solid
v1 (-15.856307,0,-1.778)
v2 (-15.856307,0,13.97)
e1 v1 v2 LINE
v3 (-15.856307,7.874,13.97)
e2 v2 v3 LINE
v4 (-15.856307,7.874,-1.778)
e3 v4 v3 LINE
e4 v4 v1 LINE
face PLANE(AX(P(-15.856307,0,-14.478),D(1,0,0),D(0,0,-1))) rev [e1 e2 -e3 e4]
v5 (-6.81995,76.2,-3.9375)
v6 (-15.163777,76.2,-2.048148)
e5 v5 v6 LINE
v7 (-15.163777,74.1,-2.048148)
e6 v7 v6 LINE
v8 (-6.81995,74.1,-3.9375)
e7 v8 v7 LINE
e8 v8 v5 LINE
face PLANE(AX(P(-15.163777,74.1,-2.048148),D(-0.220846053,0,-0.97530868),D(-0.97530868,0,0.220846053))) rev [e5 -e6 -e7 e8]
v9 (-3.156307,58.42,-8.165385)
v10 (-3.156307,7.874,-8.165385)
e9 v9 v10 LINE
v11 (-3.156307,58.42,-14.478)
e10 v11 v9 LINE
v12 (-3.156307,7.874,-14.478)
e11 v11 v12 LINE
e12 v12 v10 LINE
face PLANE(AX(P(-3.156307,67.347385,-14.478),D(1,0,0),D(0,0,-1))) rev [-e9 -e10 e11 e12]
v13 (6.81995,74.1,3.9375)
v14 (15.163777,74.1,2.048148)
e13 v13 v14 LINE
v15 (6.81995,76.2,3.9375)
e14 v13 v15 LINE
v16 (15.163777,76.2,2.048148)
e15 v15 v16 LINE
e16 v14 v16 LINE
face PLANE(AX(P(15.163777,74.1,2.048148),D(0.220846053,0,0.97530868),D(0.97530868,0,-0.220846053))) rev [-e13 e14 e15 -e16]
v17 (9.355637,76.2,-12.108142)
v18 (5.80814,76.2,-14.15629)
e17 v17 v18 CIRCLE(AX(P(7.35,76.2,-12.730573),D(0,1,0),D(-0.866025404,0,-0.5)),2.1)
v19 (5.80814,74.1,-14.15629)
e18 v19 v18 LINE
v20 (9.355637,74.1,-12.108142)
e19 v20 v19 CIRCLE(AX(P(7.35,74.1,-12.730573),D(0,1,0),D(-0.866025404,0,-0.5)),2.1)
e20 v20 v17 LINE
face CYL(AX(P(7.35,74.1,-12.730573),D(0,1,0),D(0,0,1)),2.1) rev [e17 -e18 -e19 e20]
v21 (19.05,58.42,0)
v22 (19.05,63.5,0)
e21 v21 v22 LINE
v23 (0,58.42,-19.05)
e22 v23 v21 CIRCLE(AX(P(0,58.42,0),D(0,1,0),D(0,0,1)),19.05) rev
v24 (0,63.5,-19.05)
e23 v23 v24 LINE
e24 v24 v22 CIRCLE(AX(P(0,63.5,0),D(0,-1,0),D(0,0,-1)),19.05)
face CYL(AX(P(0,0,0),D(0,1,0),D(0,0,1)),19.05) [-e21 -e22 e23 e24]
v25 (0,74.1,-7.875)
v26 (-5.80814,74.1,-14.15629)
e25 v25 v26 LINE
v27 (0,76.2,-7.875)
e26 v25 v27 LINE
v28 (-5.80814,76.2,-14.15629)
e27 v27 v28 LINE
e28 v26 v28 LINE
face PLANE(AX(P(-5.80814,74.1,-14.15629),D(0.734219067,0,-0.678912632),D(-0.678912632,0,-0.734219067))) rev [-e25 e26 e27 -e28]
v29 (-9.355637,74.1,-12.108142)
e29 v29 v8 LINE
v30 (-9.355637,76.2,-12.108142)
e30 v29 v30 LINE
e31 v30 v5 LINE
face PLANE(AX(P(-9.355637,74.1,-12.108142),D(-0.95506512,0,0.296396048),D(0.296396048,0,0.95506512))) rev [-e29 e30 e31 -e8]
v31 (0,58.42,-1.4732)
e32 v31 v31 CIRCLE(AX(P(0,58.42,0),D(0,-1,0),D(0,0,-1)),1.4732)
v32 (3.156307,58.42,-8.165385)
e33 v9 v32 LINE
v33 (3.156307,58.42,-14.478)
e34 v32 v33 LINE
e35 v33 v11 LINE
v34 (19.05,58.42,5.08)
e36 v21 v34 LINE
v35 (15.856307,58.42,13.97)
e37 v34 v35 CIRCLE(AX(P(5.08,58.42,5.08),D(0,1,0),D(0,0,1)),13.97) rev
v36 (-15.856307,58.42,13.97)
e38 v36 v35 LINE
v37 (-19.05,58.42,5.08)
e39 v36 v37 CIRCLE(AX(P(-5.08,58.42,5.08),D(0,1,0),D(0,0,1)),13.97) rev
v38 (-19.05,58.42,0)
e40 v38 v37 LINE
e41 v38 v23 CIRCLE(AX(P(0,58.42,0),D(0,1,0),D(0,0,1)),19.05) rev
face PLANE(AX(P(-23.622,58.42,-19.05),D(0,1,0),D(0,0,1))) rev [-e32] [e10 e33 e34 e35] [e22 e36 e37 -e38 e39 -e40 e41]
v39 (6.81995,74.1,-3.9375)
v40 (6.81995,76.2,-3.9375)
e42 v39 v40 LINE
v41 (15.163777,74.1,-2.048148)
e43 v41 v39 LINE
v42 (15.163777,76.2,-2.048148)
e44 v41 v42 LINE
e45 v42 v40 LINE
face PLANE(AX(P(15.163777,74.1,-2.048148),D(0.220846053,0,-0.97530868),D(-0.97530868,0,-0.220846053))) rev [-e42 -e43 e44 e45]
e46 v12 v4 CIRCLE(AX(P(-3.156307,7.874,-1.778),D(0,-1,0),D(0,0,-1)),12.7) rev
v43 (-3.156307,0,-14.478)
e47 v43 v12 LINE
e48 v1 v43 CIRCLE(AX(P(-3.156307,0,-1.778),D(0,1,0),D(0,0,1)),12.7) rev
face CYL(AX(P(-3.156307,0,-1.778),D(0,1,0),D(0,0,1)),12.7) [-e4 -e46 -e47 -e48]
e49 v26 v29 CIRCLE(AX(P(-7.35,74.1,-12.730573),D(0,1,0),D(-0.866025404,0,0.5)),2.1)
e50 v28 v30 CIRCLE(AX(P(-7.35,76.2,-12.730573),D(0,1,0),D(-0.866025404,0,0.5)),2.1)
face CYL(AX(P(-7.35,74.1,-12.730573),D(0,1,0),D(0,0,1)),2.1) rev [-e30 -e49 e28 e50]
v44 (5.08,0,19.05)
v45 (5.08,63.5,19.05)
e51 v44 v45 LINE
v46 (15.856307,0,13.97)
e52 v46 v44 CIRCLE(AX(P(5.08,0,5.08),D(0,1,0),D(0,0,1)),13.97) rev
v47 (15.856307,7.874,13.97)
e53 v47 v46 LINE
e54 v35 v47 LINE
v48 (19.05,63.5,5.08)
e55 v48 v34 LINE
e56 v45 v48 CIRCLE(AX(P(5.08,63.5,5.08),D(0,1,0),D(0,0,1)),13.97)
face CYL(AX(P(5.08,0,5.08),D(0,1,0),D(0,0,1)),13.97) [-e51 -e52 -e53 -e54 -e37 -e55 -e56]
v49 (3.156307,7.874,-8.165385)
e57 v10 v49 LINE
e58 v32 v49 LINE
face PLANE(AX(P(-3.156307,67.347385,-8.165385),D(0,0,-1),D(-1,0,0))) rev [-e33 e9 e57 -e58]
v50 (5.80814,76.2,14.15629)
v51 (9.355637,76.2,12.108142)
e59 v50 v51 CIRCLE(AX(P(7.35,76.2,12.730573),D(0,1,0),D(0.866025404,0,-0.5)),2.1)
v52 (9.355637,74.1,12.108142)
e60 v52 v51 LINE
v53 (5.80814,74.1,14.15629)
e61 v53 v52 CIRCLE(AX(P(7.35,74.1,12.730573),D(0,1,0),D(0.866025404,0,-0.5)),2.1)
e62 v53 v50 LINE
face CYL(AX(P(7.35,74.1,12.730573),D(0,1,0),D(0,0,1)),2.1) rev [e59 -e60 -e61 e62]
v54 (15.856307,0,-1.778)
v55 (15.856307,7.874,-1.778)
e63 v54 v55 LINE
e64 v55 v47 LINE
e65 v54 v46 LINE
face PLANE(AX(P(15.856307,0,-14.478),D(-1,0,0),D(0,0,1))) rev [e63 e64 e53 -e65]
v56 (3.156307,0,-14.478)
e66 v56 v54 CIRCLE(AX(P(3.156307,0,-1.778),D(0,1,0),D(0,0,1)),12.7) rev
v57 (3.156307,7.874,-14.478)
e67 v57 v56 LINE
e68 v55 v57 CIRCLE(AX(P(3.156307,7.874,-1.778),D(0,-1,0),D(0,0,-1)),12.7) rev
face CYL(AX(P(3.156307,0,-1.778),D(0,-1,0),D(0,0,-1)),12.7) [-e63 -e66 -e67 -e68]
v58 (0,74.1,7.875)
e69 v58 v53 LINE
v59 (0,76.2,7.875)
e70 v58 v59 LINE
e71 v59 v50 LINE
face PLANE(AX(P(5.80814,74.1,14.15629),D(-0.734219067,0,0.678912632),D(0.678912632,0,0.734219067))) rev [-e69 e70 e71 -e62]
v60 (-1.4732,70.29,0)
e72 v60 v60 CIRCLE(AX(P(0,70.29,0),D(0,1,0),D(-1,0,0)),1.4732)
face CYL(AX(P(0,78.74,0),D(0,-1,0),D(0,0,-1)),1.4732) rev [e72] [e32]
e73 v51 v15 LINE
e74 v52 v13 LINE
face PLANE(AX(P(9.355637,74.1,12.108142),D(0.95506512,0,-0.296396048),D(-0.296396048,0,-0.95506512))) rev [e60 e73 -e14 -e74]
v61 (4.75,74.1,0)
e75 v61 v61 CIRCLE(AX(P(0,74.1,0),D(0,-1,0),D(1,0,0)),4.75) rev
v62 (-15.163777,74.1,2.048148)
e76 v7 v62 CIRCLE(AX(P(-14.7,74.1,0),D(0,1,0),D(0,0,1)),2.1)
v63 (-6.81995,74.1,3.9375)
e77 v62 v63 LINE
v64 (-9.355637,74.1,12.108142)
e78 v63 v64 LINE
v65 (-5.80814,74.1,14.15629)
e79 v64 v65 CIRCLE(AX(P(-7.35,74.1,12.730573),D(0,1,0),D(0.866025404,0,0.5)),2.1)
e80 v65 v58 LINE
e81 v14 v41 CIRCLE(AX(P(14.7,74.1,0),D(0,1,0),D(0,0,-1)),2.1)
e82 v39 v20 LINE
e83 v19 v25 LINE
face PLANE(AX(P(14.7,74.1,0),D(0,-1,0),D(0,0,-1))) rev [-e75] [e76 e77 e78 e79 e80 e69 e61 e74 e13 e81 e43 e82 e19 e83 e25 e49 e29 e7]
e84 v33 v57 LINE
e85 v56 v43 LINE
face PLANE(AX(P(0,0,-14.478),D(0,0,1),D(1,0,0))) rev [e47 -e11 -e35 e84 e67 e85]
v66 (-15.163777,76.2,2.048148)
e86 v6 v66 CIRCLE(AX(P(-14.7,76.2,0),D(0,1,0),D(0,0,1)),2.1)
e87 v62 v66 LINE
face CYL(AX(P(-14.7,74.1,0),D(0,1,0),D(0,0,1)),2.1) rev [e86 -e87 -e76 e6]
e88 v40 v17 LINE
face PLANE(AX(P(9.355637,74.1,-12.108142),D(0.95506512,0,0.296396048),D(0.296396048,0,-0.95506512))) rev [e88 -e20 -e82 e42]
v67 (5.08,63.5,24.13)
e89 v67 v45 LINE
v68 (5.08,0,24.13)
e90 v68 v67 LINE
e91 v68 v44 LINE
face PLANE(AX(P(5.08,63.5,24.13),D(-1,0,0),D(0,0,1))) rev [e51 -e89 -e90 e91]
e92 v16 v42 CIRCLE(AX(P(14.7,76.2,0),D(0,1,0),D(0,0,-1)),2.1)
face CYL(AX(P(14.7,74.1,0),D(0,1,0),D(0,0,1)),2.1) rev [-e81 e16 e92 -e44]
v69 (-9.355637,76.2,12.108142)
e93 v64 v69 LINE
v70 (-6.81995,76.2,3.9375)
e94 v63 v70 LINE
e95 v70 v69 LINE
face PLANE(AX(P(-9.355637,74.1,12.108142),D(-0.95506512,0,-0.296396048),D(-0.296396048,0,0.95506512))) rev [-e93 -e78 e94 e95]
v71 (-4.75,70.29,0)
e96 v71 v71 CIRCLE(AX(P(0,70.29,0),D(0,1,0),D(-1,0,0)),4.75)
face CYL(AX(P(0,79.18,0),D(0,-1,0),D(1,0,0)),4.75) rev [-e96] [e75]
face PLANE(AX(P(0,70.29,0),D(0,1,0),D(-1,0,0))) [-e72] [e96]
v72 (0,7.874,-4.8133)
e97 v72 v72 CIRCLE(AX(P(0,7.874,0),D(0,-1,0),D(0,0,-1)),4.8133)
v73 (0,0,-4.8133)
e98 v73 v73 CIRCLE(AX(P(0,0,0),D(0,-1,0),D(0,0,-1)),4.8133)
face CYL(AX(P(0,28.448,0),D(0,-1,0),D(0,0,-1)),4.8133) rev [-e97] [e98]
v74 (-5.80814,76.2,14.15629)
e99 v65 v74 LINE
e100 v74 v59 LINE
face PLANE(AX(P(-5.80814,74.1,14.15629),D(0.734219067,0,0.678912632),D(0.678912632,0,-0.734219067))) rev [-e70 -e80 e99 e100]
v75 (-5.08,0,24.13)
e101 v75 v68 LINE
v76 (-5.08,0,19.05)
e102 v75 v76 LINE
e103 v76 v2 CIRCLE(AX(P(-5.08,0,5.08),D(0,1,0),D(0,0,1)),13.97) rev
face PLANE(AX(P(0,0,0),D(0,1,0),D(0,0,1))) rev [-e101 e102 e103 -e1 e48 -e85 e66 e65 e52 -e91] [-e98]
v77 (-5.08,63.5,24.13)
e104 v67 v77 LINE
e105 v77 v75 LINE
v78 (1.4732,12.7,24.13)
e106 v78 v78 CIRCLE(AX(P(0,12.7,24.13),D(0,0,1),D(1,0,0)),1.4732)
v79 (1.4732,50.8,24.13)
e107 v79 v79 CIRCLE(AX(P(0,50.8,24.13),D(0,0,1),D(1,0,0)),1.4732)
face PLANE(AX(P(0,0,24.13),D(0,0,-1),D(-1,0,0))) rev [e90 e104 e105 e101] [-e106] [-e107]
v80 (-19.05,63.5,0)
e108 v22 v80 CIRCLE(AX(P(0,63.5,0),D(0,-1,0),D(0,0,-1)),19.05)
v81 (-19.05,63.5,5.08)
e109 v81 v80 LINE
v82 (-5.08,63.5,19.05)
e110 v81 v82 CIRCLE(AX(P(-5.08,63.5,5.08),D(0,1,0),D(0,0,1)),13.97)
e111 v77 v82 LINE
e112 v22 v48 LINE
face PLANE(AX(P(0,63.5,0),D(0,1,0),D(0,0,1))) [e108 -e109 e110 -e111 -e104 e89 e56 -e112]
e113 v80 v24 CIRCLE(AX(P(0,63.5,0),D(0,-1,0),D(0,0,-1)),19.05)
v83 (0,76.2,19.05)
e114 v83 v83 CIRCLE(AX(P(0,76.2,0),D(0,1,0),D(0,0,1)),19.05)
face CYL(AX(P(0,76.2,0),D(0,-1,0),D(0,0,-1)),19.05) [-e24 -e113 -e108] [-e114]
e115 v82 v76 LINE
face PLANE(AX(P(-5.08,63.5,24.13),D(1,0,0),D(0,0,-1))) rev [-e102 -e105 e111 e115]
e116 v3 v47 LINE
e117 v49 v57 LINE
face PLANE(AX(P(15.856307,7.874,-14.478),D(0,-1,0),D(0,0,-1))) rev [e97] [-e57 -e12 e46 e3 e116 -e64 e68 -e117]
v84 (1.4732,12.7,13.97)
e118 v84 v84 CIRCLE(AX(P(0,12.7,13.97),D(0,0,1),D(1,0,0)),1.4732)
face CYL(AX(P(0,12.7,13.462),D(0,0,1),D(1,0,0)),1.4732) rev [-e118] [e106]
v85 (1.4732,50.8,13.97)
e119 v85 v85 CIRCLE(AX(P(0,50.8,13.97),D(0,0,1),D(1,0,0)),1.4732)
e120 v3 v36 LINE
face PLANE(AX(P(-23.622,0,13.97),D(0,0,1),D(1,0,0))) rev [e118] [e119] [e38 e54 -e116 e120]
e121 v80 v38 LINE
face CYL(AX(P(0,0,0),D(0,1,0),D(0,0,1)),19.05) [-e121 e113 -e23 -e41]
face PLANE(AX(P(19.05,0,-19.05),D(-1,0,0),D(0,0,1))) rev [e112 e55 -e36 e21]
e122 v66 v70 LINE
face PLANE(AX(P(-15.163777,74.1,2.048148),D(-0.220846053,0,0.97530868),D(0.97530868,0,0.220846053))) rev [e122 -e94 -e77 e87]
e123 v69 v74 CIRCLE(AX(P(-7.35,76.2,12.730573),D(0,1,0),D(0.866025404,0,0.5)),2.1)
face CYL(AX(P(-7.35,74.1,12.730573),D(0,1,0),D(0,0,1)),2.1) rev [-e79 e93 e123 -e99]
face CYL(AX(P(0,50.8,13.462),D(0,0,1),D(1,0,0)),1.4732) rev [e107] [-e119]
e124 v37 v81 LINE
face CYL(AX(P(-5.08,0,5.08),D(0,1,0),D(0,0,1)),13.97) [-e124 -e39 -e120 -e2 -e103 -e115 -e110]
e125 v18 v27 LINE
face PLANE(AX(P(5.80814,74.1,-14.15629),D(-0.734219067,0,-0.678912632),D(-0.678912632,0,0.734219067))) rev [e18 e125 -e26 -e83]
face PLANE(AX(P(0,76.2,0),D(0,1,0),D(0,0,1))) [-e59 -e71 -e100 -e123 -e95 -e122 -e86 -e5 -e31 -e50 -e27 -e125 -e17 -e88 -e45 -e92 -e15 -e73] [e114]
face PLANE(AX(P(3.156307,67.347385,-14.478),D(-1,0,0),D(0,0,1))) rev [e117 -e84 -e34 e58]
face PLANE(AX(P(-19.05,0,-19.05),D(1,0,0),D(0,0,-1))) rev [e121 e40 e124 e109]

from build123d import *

# Parameters (mm, degrees)
SKETCH1_R               = 19.05
BOSS_EXTRUDE1_DEPTH     = 76.2
CAVITY1_START           = 74.1
CAVITY1_OUTLINE_R       = 1.05
CAVITY1_OUTLINE_R_2     = 4.4625
CAVITY1_DEPTH           = 2.1
CAVITY1_START_2         = 71.1599999
CAVITY1_2_OUTLINE_R     = 4.4625
CAVITY1_2_OUTLINE_R_2   = 3.15
CAVITY1_2_DEPTH         = 4.7775
CAVITY1_3_OUTLINE_R     = 3.15
CAVITY1_3_OUTLINE_R_2   = 1.785
CAVITY1_3_DEPTH         = 1.05
CAVITY1_START_3         = 70.95
CAVITY1_4_DEPTH         = 3.15
CUT_EXTRUDE1_DEPTH      = 5.08
CUT_EXTRUDE1_DEPTH_BACK = 3.81
SKETCH2_R               = 4.75
SKETCH4_W               = 8.715142414
SKETCH4_H               = 2.720359939
CUT_EXTRUDE2_DEPTH      = 2.1
SKETCH5_R               = 19.05
CUT_EXTRUDE3_DEPTH      = 63.5
SKETCH8_W               = 38.1
SKETCH8_H               = 38.1
BOSS_EXTRUDE2_DEPTH     = 63.5
SKETCH9_W               = 33.02
SKETCH9_H               = 58.42
CUT_EXTRUDE4_DEPTH      = 42.672
FILLET1_R               = 19.05
FILLET2_R               = 13.97
SKETCH11_W              = 10.16
SKETCH11_H              = 63.5
BOSS_EXTRUDE3_DEPTH     = 5.08
SKETCH12_R              = 1.4732
CUT_EXTRUDE5_DEPTH      = 10.668
SKETCH13_R              = 1.4732
CUT_EXTRUDE6_DEPTH      = 20.32
SKETCH14_W              = 31.71261469
SKETCH14_H              = 7.874
BOSS_EXTRUDE4_DEPTH     = 28.448
FILLET3_R               = 12.7
SKETCH15_R              = 4.8133
CUT_EXTRUDE7_DEPTH      = 28.448
SKETCH16_W              = 2.261133912
SKETCH16_H              = 1.481432563
SKETCH16_W_2            = 1.871283238
SKETCH16_H_2            = 2.027223507
SKETCH16_W_3            = 2.027223508
SKETCH16_H_3            = 2.222148845
SKETCH16_W_4            = 12.670146923
SKETCH16_H_4            = 11.890445574
SKETCH16_W_5            = 1.793313103
SKETCH16_W_6            = 2.30011898
SKETCH16_H_5            = 1.793313103
SKETCH16_H_6            = 1.520417631
CUT_EXTRUDE8_DEPTH      = 2.1
SKETCH17_W              = 6.31261469
SKETCH17_H              = 6.312614691
BOSS_EXTRUDE5_DEPTH     = 50.546


with BuildPart() as part:
    # Sketch1 → Boss-Extrude1 (new body)
    with BuildSketch(Plane(origin=(0, 0, 0), x_dir=(1, 0, 0), z_dir=(0, 1, 0))):
        with Locations(Location((0, 0, 0), (0, 0, 90))):
            Circle(SKETCH1_R)
    extrude(amount=BOSS_EXTRUDE1_DEPTH)

    # Cavity1: read off the stored shape, not the designer's step
    # Cavity1 outline → Cavity1 (cut)
    with BuildSketch(Plane(origin=(0, 0, 0), x_dir=(1, 0, 0), z_dir=(0, 1, 0)).offset(CAVITY1_START)):
        with BuildLine():
            ThreePointArc((5.80813996, -14.156289963), (8.4, -14.549226784), (9.355636751, -12.108141735))
            Line((9.355636751, -12.108141735), (6.819950055, -3.9375))
            Line((6.819950055, -3.9375), (15.163776711, -2.048148228))
            ThreePointArc((15.163776711, -2.048148228), (16.8, 0), (15.163776711, 2.048148228))
            Line((15.163776711, 2.048148228), (6.819950055, 3.9375))
            Line((6.819950055, 3.9375), (9.355636751, 12.108141735))
            ThreePointArc((9.355636751, 12.108141735), (8.4, 14.549226784), (5.80813996, 14.156289963))
            Line((5.80813996, 14.156289963), (0, 7.875))
            Line((0, 7.875), (-5.80813996, 14.156289963))
            ThreePointArc((-5.80813996, 14.156289963), (-8.4, 14.549226784), (-9.355636751, 12.108141735))
            Line((-9.355636751, 12.108141735), (-6.819950055, 3.9375))
            Line((-6.819950055, 3.9375), (-15.163776711, 2.048148228))
            ThreePointArc((-15.163776711, 2.048148228), (-16.8, 0), (-15.163776711, -2.048148228))
            Line((-15.163776711, -2.048148228), (-6.819950055, -3.9375))
            Line((-6.819950055, -3.9375), (-9.355636751, -12.108141735))
            ThreePointArc((-9.355636751, -12.108141735), (-8.4, -14.549226784), (-5.80813996, -14.156289963))
            Line((-5.80813996, -14.156289963), (0, -7.875))
            Line((0, -7.875), (5.80813996, -14.156289963))
        make_face()
        with Locations((-7.0875, -12.275910099)):
            Circle(CAVITY1_OUTLINE_R, mode=Mode.SUBTRACT)
        with Locations((-5.5125, -9.547930077)):
            Circle(CAVITY1_OUTLINE_R, mode=Mode.SUBTRACT)
        with Locations((-3.9375, -6.819950055)):
            Circle(CAVITY1_OUTLINE_R, mode=Mode.SUBTRACT)
        with Locations((7.0875, -12.275910099)):
            Circle(CAVITY1_OUTLINE_R, mode=Mode.SUBTRACT)
        with Locations((5.5125, -9.547930077)):
            Circle(CAVITY1_OUTLINE_R, mode=Mode.SUBTRACT)
        with Locations((3.9375, -6.819950055)):
            Circle(CAVITY1_OUTLINE_R, mode=Mode.SUBTRACT)
        with Locations((-14.175, 0)):
            Circle(CAVITY1_OUTLINE_R, mode=Mode.SUBTRACT)
        with Locations((-11.025, 0)):
            Circle(CAVITY1_OUTLINE_R, mode=Mode.SUBTRACT)
        with Locations((-7.875, 0)):
            Circle(CAVITY1_OUTLINE_R, mode=Mode.SUBTRACT)
        with Locations((-3.9375, 6.819950055)):
            Circle(CAVITY1_OUTLINE_R, mode=Mode.SUBTRACT)
        with Locations((-5.5125, 9.547930077)):
            Circle(CAVITY1_OUTLINE_R, mode=Mode.SUBTRACT)
        with Locations((-7.0875, 12.275910099)):
            Circle(CAVITY1_OUTLINE_R, mode=Mode.SUBTRACT)
        Circle(CAVITY1_OUTLINE_R_2, mode=Mode.SUBTRACT)
        with Locations((7.875, 0)):
            Circle(CAVITY1_OUTLINE_R, mode=Mode.SUBTRACT)
        with Locations((3.9375, 6.819950055)):
            Circle(CAVITY1_OUTLINE_R, mode=Mode.SUBTRACT)
        with Locations((11.025, 0)):
            Circle(CAVITY1_OUTLINE_R, mode=Mode.SUBTRACT)
        with Locations((14.175, 0)):
            Circle(CAVITY1_OUTLINE_R, mode=Mode.SUBTRACT)
        with Locations((5.5125, 9.547930077)):
            Circle(CAVITY1_OUTLINE_R, mode=Mode.SUBTRACT)
        with Locations((7.0875, 12.275910099)):
            Circle(CAVITY1_OUTLINE_R, mode=Mode.SUBTRACT)
    extrude(amount=CAVITY1_DEPTH, mode=Mode.SUBTRACT)

    # Cavity1 2 outline → Cavity1 2 (cut)
    with BuildSketch(Plane(origin=(0, 0, 0), x_dir=(1, 0, 0), z_dir=(0, 1, 0)).offset(CAVITY1_START_2)):
        Circle(CAVITY1_2_OUTLINE_R)
        Circle(CAVITY1_2_OUTLINE_R_2, mode=Mode.SUBTRACT)
    extrude(amount=CAVITY1_2_DEPTH, mode=Mode.SUBTRACT)

    # Cavity1 3 outline → Cavity1 3 (cut)
    with BuildSketch(Plane(origin=(0, 0, 0), x_dir=(1, 0, 0), z_dir=(0, 1, 0)).offset(CAVITY1_START)):
        Circle(CAVITY1_3_OUTLINE_R)
        Circle(CAVITY1_3_OUTLINE_R_2, mode=Mode.SUBTRACT)
    extrude(amount=CAVITY1_3_DEPTH, mode=Mode.SUBTRACT)

    # Cavity1 4 outline → Cavity1 4 (cut)
    with BuildSketch(Plane(origin=(0, 0, 0), x_dir=(1, 0, 0), z_dir=(0, 1, 0)).offset(CAVITY1_START_3)):
        with BuildLine():
            ThreePointArc((3.135298976, -0.303974232), (3.15, 0), (3.135298976, 0.303974232))
            Line((3.135298976, 0.303974232), (2.73, 0))
            Line((2.73, 0), (3.135298976, -0.303974232))
        make_face()
        with BuildLine():
            Line((2.636977506, 0.706575993), (3.107140574, 0.517858526))
            ThreePointArc((3.107140574, 0.517858526), (3.042666353, 0.815279992), (2.949791933, 1.105091648))
            Line((2.949791933, 1.105091648), (2.636977506, 0.706575993))
        make_face()
        with BuildLine():
            ThreePointArc((2.949791933, -1.105091648), (3.042666353, -0.815279992), (3.107140574, -0.517858526))
            Line((3.107140574, -0.517858526), (2.636977506, -0.706575993))
            Line((2.636977506, -0.706575993), (2.949791933, -1.105091648))
        make_face()
        with BuildLine():
            Line((2.364249352, 1.365), (2.867235677, 1.304400081))
            ThreePointArc((2.867235677, 1.304400081), (2.727980022, 1.575), (2.563261445, 1.830898895))
            Line((2.563261445, 1.830898895), (2.364249352, 1.365))
        make_face()
        with BuildLine():
            ThreePointArc((2.563261445, -1.830898895), (2.727980022, -1.575), (2.867235677, -1.304400081))
            Line((2.867235677, -1.304400081), (2.364249352, -1.365))
            Line((2.364249352, -1.365), (2.563261445, -1.830898895))
        make_face()
        with BuildLine():
            Line((1.930401513, 1.930401513), (2.431933407, 2.002048926))
            ThreePointArc((2.431933407, 2.002048926), (2.227386361, 2.227386361), (2.002048926, 2.431933407))
            Line((2.002048926, 2.431933407), (1.930401513, 1.930401513))
        make_face()
        with BuildLine():
            ThreePointArc((2.002048926, -2.431933407), (2.227386361, -2.227386361), (2.431933407, -2.002048926))
            Line((2.431933407, -2.002048926), (1.930401513, -1.930401513))
            Line((1.930401513, -1.930401513), (2.002048926, -2.431933407))
        make_face()
        with BuildLine():
            Line((1.365, 2.364249352), (1.830898895, 2.563261445))
            ThreePointArc((1.830898895, 2.563261445), (1.575, 2.727980022), (1.304400081, 2.867235677))
            Line((1.304400081, 2.867235677), (1.365, 2.364249352))
        make_face()
        with BuildLine():
            ThreePointArc((1.304400081, -2.867235677), (1.575, -2.727980022), (1.830898895, -2.563261445))
            Line((1.830898895, -2.563261445), (1.365, -2.364249352))
            Line((1.365, -2.364249352), (1.304400081, -2.867235677))
        make_face()
        with BuildLine():
            Line((0.706575993, 2.636977506), (1.105091648, 2.949791933))
            ThreePointArc((1.105091648, 2.949791933), (0.815279992, 3.042666353), (0.517858526, 3.107140574))
            Line((0.517858526, 3.107140574), (0.706575993, 2.636977506))
        make_face()
        with BuildLine():
            ThreePointArc((0.517858526, -3.107140574), (0.815279992, -3.042666353), (1.105091648, -2.949791933))
            Line((1.105091648, -2.949791933), (0.706575993, -2.636977506))
            Line((0.706575993, -2.636977506), (0.517858526, -3.107140574))
        make_face()
        with BuildLine():
            Line((0, 2.73), (0.303974232, 3.135298976))
            ThreePointArc((0.303974232, 3.135298976), (0, 3.15), (-0.303974232, 3.135298976))
            Line((-0.303974232, 3.135298976), (0, 2.73))
        make_face()
        with BuildLine():
            ThreePointArc((-0.303974232, -3.135298976), (0, -3.15), (0.303974232, -3.135298976))
            Line((0.303974232, -3.135298976), (0, -2.73))
            Line((0, -2.73), (-0.303974232, -3.135298976))
        make_face()
        with BuildLine():
            Line((-0.706575993, 2.636977506), (-0.517858526, 3.107140574))
            ThreePointArc((-0.517858526, 3.107140574), (-0.815279992, 3.042666353), (-1.105091648, 2.949791933))
            Line((-1.105091648, 2.949791933), (-0.706575993, 2.636977506))
        make_face()
        with BuildLine():
            ThreePointArc((-1.105091648, -2.949791933), (-0.815279992, -3.042666353), (-0.517858526, -3.107140574))
            Line((-0.517858526, -3.107140574), (-0.706575993, -2.636977506))
            Line((-0.706575993, -2.636977506), (-1.105091648, -2.949791933))
        make_face()
        with BuildLine():
            Line((-1.365, 2.364249352), (-1.304400081, 2.867235677))
            ThreePointArc((-1.304400081, 2.867235677), (-1.575, 2.727980022), (-1.830898895, 2.563261445))
            Line((-1.830898895, 2.563261445), (-1.365, 2.364249352))
        make_face()
        with BuildLine():
            ThreePointArc((-1.830898895, -2.563261445), (-1.575, -2.727980022), (-1.304400081, -2.867235677))
            Line((-1.304400081, -2.867235677), (-1.365, -2.364249352))
            Line((-1.365, -2.364249352), (-1.830898895, -2.563261445))
        make_face()
        with BuildLine():
            Line((-1.930401513, 1.930401513), (-2.002048926, 2.431933407))
            ThreePointArc((-2.002048926, 2.431933407), (-2.227386361, 2.227386361), (-2.431933407, 2.002048926))
            Line((-2.431933407, 2.002048926), (-1.930401513, 1.930401513))
        make_face()
        with BuildLine():
            ThreePointArc((-2.431933407, -2.002048926), (-2.227386361, -2.227386361), (-2.002048926, -2.431933407))
            Line((-2.002048926, -2.431933407), (-1.930401513, -1.930401513))
            Line((-1.930401513, -1.930401513), (-2.431933407, -2.002048926))
        make_face()
        with BuildLine():
            Line((-2.364249352, 1.365), (-2.563261445, 1.830898895))
            ThreePointArc((-2.563261445, 1.830898895), (-2.727980022, 1.575), (-2.867235677, 1.304400081))
            Line((-2.867235677, 1.304400081), (-2.364249352, 1.365))
        make_face()
        with BuildLine():
            ThreePointArc((-2.867235677, -1.304400081), (-2.727980022, -1.575), (-2.563261445, -1.830898895))
            Line((-2.563261445, -1.830898895), (-2.364249352, -1.365))
            Line((-2.364249352, -1.365), (-2.867235677, -1.304400081))
        make_face()
        with BuildLine():
            Line((-2.636977506, 0.706575993), (-2.949791933, 1.105091648))
            ThreePointArc((-2.949791933, 1.105091648), (-3.042666353, 0.815279992), (-3.107140574, 0.517858526))
            Line((-3.107140574, 0.517858526), (-2.636977506, 0.706575993))
        make_face()
        with BuildLine():
            ThreePointArc((-3.107140574, -0.517858526), (-3.042666353, -0.815279992), (-2.949791933, -1.105091648))
            Line((-2.949791933, -1.105091648), (-2.636977506, -0.706575993))
            Line((-2.636977506, -0.706575993), (-3.107140574, -0.517858526))
        make_face()
        with BuildLine():
            Line((-2.73, 0), (-3.135298976, 0.303974232))
            ThreePointArc((-3.135298976, 0.303974232), (-3.15, 0), (-3.135298976, -0.303974232))
            Line((-3.135298976, -0.303974232), (-2.73, 0))
        make_face()
    extrude(amount=CAVITY1_4_DEPTH, mode=Mode.SUBTRACT)

    # Cavity1 5 outline → Cavity1 5 (revolve, cut)
    with BuildSketch(Plane.XY):
        with BuildLine():
            Line((3.15, 75.9375), (4.4625, 75.9374999))
            Line((4.4625, 75.9374999), (4.4625, 76.2))
            Line((4.4625, 76.2), (3.4125, 76.2))
            ThreePointArc((3.4125, 76.2), (3.22688447, 76.12311553), (3.15, 75.9375))
        make_face()
        with BuildLine():
            Line((3.15, 70.95), (4.2525, 70.95))
            ThreePointArc((4.2525, 70.95), (4.400992424, 71.011507576), (4.4625, 71.16))
            Line((4.4625, 71.16), (3.15, 71.1599999))
            Line((3.15, 71.1599999), (3.15, 70.95))
        make_face()
    revolve(axis=Axis((0, 0, 0), (0, 1, 0)), mode=Mode.SUBTRACT)


with BuildPart() as body_2:
    # Cavity1 6 outline → Cavity1 6 (revolve)
    with BuildSketch(Plane.XY):
        with BuildLine():
            ThreePointArc((3.4125, 76.2), (3.59811553, 76.12311553), (3.675, 75.9375))
            Line((3.675, 75.9375), (3.675, 75.15))
            Line((3.675, 75.15), (4.725, 75.15))
            Line((4.725, 75.15), (4.725, 75.9375))
            ThreePointArc((4.725, 75.9375), (4.80188447, 76.12311553), (4.9875, 76.2))
            Line((4.9875, 76.2), (3.4125, 76.2))
        make_face()
    revolve(axis=Axis((0, 0, 0), (0, 1, 0)))


with BuildPart() as cut_extrude1_tool:
    # Sketch2 → Cut-Extrude1 (new, two sides: drawn at the far end of the back side and taken through both)
    with BuildSketch(Plane(origin=(0, 74.1, 0), x_dir=(1, 0, 0), z_dir=(0, 1, 0)).offset(-CUT_EXTRUDE1_DEPTH_BACK)):
        Circle(SKETCH2_R)
    extrude(amount=CUT_EXTRUDE1_DEPTH + CUT_EXTRUDE1_DEPTH_BACK)


with BuildPart() as part_1:
    add(part.part)

    # Cut-Extrude1: cut by cut_extrude1_tool
    add(cut_extrude1_tool.part, mode=Mode.SUBTRACT)

    # Sketch4 → Cut-Extrude2 (cut)
    with BuildSketch(Plane(origin=(0, 76.2, 0), x_dir=(1, 0, 0), z_dir=(0, 1, 0))):
        Polygon((1.823455226, -5.611970264), (6.088368584, -13.454724965), (8.574108094, -12.102972418), (4.427174762, -4.477171338), align=None)
        with Locations((10.445939791, -0.057681561)):
            Rectangle(SKETCH4_W, SKETCH4_H)
        Polygon((-1.774869218, -6.007839079), (-6.011321946, -13.087622733), (-8.632108857, -12.464519484), (-4.772101225, -4.214333468), align=None)
        Polygon((-6.011321946, 1.774023268), (-6.011321946, -1.972920099), (-14.424619624, -1.417861531), (-14.929825471, 1.302498408), (-12.950446355, 1.670094581), align=None)
        Polygon((-1.457669544, 5.89987102), (-5.07831145, 4.636856402), (-8.632108857, 12.299145085), (-6.011321946, 13.514675603), align=None)
        Polygon((4.773202572, 4.636856402), (0.880986898, 6.010579581), (6.537597068, 13.703234469), (8.44707549, 12.299145085), align=None)
    extrude(amount=-CUT_EXTRUDE2_DEPTH, mode=Mode.SUBTRACT)

    # Sketch5 → Cut-Extrude3 (cut)
    with BuildSketch(Plane.XZ):
        with Locations(Location((0, 0, 0), (0, 0, 270))):
            Circle(SKETCH5_R)
    extrude(amount=-CUT_EXTRUDE3_DEPTH, mode=Mode.SUBTRACT)

    # Sketch8 → Boss-Extrude2 (add)
    with BuildSketch(Plane.XZ.offset(-63.5)):
        Rectangle(SKETCH8_W, SKETCH8_H)
    extrude(amount=BOSS_EXTRUDE2_DEPTH)

    # Sketch9 → Cut-Extrude4 (cut)
    with BuildSketch(Plane(origin=(19.05, 0, 0), x_dir=(0, 0, -1), z_dir=(1, 0, 0))):
        with Locations((2.54, 29.21)):
            Rectangle(SKETCH9_W, SKETCH9_H)
    extrude(amount=-CUT_EXTRUDE4_DEPTH, mode=Mode.SUBTRACT)

    # Fillet1
    fillet1_edges = [part_1.edges().sort_by_distance(p)[0] for p in [
        (19.05, 60.96, -19.05),
        (-19.05, 60.96, -19.05),
    ]]
    fillet(fillet1_edges, radius=FILLET1_R - 0.0001)  # a hair under: the kernel refuses the full size

    # Fillet2
    fillet2_edges = [part_1.edges().sort_by_distance(p)[0] for p in [
        (-19.05, 31.75, 19.05),
        (19.05, 31.75, 19.05),
    ]]
    fillet(fillet2_edges, radius=FILLET2_R)

    # Sketch11 → Boss-Extrude3 (add)
    with BuildSketch(Plane.XY.offset(19.05)):
        with Locations((0, 31.75)):
            Rectangle(SKETCH11_W, SKETCH11_H)
    extrude(amount=BOSS_EXTRUDE3_DEPTH)

    # Sketch12 → Cut-Extrude5 (cut)
    with BuildSketch(Plane.XY.offset(24.13)):
        with Locations((0, 50.8)):
            Circle(SKETCH12_R)
        with Locations((0, 12.7)):
            Circle(SKETCH12_R)
    extrude(amount=-CUT_EXTRUDE5_DEPTH, mode=Mode.SUBTRACT)

    # Sketch13 → Cut-Extrude6 (cut)
    with BuildSketch(Plane.XZ.offset(-58.42)):
        with Locations(Location((0, 0, 0), (0, 0, 270))):
            Circle(SKETCH13_R)
    extrude(amount=-CUT_EXTRUDE6_DEPTH, mode=Mode.SUBTRACT)

    # Sketch14 → Boss-Extrude4 (add)
    with BuildSketch(Plane(origin=(0, 0, 13.97), x_dir=(-1, 0, 0), z_dir=(0, 0, -1))):
        with Locations((0, 3.937)):
            Rectangle(SKETCH14_W, SKETCH14_H)
    extrude(amount=BOSS_EXTRUDE4_DEPTH)

    # Fillet3
    fillet3_edges = [part_1.edges().sort_by_distance(p)[0] for p in [
        (15.856307345, 3.937, -14.478),
        (-15.856307345, 3.937, -14.478),
    ]]
    fillet(fillet3_edges, radius=FILLET3_R)

    # Sketch15 → Cut-Extrude7 (cut)
    with BuildSketch(Plane.XZ):
        with Locations(Location((0, 0, 0), (0, 0, 270))):
            Circle(SKETCH15_R)
    extrude(amount=-CUT_EXTRUDE7_DEPTH, mode=Mode.SUBTRACT)


with BuildPart() as body_2_1:
    add(body_2.part)

    # Cut-Extrude1: cut by cut_extrude1_tool
    add(cut_extrude1_tool.part, mode=Mode.SUBTRACT)


with BuildPart() as cut_extrude8_tool:
    # Sketch16 → Cut-Extrude8 (new body)
    with BuildSketch(Plane(origin=(0, 74.1, 0), x_dir=(1, 0, 0), z_dir=(0, 1, 0))):
        with Locations((-7.269758387, 12.831380038)):
            Rectangle(SKETCH16_W, SKETCH16_H)
        with Locations((7.622537381, 12.558484566)):
            Rectangle(SKETCH16_W_2, SKETCH16_H_2)
        with Locations((-14.715906271, -0.131154891)):
            Rectangle(SKETCH16_W_3, SKETCH16_H_3)
        with Locations((-0.077013442, 0.60956139)):
            Rectangle(SKETCH16_W_4, SKETCH16_H_4)
        with Locations((15.029700198, -0.131154891)):
            Rectangle(SKETCH16_W_5, SKETCH16_H_3)
        with Locations((7.40811951, -12.664854078)):
            Rectangle(SKETCH16_W_6, SKETCH16_H_5)
        with Locations((-7.269758387, -12.801301815)):
            Rectangle(SKETCH16_W, SKETCH16_H_6)
    extrude(amount=CUT_EXTRUDE8_DEPTH)


with BuildPart() as part_2:
    add(part_1.part)

    # Cut-Extrude8: cut by cut_extrude8_tool
    add(cut_extrude8_tool.part, mode=Mode.SUBTRACT)

    # Sketch17 → Boss-Extrude5 (add)
    with BuildSketch(Plane(origin=(0, 7.874, 0), x_dir=(1, 0, 0), z_dir=(0, 1, 0))):
        with Locations((0, 11.321692655)):
            Rectangle(SKETCH17_W, SKETCH17_H)
    extrude(amount=BOSS_EXTRUDE5_DEPTH)


with BuildPart() as body_2_2:
    add(body_2_1.part)

    # Cut-Extrude8: cut by cut_extrude8_tool
    add(cut_extrude8_tool.part, mode=Mode.SUBTRACT)


solid = part_2.part
